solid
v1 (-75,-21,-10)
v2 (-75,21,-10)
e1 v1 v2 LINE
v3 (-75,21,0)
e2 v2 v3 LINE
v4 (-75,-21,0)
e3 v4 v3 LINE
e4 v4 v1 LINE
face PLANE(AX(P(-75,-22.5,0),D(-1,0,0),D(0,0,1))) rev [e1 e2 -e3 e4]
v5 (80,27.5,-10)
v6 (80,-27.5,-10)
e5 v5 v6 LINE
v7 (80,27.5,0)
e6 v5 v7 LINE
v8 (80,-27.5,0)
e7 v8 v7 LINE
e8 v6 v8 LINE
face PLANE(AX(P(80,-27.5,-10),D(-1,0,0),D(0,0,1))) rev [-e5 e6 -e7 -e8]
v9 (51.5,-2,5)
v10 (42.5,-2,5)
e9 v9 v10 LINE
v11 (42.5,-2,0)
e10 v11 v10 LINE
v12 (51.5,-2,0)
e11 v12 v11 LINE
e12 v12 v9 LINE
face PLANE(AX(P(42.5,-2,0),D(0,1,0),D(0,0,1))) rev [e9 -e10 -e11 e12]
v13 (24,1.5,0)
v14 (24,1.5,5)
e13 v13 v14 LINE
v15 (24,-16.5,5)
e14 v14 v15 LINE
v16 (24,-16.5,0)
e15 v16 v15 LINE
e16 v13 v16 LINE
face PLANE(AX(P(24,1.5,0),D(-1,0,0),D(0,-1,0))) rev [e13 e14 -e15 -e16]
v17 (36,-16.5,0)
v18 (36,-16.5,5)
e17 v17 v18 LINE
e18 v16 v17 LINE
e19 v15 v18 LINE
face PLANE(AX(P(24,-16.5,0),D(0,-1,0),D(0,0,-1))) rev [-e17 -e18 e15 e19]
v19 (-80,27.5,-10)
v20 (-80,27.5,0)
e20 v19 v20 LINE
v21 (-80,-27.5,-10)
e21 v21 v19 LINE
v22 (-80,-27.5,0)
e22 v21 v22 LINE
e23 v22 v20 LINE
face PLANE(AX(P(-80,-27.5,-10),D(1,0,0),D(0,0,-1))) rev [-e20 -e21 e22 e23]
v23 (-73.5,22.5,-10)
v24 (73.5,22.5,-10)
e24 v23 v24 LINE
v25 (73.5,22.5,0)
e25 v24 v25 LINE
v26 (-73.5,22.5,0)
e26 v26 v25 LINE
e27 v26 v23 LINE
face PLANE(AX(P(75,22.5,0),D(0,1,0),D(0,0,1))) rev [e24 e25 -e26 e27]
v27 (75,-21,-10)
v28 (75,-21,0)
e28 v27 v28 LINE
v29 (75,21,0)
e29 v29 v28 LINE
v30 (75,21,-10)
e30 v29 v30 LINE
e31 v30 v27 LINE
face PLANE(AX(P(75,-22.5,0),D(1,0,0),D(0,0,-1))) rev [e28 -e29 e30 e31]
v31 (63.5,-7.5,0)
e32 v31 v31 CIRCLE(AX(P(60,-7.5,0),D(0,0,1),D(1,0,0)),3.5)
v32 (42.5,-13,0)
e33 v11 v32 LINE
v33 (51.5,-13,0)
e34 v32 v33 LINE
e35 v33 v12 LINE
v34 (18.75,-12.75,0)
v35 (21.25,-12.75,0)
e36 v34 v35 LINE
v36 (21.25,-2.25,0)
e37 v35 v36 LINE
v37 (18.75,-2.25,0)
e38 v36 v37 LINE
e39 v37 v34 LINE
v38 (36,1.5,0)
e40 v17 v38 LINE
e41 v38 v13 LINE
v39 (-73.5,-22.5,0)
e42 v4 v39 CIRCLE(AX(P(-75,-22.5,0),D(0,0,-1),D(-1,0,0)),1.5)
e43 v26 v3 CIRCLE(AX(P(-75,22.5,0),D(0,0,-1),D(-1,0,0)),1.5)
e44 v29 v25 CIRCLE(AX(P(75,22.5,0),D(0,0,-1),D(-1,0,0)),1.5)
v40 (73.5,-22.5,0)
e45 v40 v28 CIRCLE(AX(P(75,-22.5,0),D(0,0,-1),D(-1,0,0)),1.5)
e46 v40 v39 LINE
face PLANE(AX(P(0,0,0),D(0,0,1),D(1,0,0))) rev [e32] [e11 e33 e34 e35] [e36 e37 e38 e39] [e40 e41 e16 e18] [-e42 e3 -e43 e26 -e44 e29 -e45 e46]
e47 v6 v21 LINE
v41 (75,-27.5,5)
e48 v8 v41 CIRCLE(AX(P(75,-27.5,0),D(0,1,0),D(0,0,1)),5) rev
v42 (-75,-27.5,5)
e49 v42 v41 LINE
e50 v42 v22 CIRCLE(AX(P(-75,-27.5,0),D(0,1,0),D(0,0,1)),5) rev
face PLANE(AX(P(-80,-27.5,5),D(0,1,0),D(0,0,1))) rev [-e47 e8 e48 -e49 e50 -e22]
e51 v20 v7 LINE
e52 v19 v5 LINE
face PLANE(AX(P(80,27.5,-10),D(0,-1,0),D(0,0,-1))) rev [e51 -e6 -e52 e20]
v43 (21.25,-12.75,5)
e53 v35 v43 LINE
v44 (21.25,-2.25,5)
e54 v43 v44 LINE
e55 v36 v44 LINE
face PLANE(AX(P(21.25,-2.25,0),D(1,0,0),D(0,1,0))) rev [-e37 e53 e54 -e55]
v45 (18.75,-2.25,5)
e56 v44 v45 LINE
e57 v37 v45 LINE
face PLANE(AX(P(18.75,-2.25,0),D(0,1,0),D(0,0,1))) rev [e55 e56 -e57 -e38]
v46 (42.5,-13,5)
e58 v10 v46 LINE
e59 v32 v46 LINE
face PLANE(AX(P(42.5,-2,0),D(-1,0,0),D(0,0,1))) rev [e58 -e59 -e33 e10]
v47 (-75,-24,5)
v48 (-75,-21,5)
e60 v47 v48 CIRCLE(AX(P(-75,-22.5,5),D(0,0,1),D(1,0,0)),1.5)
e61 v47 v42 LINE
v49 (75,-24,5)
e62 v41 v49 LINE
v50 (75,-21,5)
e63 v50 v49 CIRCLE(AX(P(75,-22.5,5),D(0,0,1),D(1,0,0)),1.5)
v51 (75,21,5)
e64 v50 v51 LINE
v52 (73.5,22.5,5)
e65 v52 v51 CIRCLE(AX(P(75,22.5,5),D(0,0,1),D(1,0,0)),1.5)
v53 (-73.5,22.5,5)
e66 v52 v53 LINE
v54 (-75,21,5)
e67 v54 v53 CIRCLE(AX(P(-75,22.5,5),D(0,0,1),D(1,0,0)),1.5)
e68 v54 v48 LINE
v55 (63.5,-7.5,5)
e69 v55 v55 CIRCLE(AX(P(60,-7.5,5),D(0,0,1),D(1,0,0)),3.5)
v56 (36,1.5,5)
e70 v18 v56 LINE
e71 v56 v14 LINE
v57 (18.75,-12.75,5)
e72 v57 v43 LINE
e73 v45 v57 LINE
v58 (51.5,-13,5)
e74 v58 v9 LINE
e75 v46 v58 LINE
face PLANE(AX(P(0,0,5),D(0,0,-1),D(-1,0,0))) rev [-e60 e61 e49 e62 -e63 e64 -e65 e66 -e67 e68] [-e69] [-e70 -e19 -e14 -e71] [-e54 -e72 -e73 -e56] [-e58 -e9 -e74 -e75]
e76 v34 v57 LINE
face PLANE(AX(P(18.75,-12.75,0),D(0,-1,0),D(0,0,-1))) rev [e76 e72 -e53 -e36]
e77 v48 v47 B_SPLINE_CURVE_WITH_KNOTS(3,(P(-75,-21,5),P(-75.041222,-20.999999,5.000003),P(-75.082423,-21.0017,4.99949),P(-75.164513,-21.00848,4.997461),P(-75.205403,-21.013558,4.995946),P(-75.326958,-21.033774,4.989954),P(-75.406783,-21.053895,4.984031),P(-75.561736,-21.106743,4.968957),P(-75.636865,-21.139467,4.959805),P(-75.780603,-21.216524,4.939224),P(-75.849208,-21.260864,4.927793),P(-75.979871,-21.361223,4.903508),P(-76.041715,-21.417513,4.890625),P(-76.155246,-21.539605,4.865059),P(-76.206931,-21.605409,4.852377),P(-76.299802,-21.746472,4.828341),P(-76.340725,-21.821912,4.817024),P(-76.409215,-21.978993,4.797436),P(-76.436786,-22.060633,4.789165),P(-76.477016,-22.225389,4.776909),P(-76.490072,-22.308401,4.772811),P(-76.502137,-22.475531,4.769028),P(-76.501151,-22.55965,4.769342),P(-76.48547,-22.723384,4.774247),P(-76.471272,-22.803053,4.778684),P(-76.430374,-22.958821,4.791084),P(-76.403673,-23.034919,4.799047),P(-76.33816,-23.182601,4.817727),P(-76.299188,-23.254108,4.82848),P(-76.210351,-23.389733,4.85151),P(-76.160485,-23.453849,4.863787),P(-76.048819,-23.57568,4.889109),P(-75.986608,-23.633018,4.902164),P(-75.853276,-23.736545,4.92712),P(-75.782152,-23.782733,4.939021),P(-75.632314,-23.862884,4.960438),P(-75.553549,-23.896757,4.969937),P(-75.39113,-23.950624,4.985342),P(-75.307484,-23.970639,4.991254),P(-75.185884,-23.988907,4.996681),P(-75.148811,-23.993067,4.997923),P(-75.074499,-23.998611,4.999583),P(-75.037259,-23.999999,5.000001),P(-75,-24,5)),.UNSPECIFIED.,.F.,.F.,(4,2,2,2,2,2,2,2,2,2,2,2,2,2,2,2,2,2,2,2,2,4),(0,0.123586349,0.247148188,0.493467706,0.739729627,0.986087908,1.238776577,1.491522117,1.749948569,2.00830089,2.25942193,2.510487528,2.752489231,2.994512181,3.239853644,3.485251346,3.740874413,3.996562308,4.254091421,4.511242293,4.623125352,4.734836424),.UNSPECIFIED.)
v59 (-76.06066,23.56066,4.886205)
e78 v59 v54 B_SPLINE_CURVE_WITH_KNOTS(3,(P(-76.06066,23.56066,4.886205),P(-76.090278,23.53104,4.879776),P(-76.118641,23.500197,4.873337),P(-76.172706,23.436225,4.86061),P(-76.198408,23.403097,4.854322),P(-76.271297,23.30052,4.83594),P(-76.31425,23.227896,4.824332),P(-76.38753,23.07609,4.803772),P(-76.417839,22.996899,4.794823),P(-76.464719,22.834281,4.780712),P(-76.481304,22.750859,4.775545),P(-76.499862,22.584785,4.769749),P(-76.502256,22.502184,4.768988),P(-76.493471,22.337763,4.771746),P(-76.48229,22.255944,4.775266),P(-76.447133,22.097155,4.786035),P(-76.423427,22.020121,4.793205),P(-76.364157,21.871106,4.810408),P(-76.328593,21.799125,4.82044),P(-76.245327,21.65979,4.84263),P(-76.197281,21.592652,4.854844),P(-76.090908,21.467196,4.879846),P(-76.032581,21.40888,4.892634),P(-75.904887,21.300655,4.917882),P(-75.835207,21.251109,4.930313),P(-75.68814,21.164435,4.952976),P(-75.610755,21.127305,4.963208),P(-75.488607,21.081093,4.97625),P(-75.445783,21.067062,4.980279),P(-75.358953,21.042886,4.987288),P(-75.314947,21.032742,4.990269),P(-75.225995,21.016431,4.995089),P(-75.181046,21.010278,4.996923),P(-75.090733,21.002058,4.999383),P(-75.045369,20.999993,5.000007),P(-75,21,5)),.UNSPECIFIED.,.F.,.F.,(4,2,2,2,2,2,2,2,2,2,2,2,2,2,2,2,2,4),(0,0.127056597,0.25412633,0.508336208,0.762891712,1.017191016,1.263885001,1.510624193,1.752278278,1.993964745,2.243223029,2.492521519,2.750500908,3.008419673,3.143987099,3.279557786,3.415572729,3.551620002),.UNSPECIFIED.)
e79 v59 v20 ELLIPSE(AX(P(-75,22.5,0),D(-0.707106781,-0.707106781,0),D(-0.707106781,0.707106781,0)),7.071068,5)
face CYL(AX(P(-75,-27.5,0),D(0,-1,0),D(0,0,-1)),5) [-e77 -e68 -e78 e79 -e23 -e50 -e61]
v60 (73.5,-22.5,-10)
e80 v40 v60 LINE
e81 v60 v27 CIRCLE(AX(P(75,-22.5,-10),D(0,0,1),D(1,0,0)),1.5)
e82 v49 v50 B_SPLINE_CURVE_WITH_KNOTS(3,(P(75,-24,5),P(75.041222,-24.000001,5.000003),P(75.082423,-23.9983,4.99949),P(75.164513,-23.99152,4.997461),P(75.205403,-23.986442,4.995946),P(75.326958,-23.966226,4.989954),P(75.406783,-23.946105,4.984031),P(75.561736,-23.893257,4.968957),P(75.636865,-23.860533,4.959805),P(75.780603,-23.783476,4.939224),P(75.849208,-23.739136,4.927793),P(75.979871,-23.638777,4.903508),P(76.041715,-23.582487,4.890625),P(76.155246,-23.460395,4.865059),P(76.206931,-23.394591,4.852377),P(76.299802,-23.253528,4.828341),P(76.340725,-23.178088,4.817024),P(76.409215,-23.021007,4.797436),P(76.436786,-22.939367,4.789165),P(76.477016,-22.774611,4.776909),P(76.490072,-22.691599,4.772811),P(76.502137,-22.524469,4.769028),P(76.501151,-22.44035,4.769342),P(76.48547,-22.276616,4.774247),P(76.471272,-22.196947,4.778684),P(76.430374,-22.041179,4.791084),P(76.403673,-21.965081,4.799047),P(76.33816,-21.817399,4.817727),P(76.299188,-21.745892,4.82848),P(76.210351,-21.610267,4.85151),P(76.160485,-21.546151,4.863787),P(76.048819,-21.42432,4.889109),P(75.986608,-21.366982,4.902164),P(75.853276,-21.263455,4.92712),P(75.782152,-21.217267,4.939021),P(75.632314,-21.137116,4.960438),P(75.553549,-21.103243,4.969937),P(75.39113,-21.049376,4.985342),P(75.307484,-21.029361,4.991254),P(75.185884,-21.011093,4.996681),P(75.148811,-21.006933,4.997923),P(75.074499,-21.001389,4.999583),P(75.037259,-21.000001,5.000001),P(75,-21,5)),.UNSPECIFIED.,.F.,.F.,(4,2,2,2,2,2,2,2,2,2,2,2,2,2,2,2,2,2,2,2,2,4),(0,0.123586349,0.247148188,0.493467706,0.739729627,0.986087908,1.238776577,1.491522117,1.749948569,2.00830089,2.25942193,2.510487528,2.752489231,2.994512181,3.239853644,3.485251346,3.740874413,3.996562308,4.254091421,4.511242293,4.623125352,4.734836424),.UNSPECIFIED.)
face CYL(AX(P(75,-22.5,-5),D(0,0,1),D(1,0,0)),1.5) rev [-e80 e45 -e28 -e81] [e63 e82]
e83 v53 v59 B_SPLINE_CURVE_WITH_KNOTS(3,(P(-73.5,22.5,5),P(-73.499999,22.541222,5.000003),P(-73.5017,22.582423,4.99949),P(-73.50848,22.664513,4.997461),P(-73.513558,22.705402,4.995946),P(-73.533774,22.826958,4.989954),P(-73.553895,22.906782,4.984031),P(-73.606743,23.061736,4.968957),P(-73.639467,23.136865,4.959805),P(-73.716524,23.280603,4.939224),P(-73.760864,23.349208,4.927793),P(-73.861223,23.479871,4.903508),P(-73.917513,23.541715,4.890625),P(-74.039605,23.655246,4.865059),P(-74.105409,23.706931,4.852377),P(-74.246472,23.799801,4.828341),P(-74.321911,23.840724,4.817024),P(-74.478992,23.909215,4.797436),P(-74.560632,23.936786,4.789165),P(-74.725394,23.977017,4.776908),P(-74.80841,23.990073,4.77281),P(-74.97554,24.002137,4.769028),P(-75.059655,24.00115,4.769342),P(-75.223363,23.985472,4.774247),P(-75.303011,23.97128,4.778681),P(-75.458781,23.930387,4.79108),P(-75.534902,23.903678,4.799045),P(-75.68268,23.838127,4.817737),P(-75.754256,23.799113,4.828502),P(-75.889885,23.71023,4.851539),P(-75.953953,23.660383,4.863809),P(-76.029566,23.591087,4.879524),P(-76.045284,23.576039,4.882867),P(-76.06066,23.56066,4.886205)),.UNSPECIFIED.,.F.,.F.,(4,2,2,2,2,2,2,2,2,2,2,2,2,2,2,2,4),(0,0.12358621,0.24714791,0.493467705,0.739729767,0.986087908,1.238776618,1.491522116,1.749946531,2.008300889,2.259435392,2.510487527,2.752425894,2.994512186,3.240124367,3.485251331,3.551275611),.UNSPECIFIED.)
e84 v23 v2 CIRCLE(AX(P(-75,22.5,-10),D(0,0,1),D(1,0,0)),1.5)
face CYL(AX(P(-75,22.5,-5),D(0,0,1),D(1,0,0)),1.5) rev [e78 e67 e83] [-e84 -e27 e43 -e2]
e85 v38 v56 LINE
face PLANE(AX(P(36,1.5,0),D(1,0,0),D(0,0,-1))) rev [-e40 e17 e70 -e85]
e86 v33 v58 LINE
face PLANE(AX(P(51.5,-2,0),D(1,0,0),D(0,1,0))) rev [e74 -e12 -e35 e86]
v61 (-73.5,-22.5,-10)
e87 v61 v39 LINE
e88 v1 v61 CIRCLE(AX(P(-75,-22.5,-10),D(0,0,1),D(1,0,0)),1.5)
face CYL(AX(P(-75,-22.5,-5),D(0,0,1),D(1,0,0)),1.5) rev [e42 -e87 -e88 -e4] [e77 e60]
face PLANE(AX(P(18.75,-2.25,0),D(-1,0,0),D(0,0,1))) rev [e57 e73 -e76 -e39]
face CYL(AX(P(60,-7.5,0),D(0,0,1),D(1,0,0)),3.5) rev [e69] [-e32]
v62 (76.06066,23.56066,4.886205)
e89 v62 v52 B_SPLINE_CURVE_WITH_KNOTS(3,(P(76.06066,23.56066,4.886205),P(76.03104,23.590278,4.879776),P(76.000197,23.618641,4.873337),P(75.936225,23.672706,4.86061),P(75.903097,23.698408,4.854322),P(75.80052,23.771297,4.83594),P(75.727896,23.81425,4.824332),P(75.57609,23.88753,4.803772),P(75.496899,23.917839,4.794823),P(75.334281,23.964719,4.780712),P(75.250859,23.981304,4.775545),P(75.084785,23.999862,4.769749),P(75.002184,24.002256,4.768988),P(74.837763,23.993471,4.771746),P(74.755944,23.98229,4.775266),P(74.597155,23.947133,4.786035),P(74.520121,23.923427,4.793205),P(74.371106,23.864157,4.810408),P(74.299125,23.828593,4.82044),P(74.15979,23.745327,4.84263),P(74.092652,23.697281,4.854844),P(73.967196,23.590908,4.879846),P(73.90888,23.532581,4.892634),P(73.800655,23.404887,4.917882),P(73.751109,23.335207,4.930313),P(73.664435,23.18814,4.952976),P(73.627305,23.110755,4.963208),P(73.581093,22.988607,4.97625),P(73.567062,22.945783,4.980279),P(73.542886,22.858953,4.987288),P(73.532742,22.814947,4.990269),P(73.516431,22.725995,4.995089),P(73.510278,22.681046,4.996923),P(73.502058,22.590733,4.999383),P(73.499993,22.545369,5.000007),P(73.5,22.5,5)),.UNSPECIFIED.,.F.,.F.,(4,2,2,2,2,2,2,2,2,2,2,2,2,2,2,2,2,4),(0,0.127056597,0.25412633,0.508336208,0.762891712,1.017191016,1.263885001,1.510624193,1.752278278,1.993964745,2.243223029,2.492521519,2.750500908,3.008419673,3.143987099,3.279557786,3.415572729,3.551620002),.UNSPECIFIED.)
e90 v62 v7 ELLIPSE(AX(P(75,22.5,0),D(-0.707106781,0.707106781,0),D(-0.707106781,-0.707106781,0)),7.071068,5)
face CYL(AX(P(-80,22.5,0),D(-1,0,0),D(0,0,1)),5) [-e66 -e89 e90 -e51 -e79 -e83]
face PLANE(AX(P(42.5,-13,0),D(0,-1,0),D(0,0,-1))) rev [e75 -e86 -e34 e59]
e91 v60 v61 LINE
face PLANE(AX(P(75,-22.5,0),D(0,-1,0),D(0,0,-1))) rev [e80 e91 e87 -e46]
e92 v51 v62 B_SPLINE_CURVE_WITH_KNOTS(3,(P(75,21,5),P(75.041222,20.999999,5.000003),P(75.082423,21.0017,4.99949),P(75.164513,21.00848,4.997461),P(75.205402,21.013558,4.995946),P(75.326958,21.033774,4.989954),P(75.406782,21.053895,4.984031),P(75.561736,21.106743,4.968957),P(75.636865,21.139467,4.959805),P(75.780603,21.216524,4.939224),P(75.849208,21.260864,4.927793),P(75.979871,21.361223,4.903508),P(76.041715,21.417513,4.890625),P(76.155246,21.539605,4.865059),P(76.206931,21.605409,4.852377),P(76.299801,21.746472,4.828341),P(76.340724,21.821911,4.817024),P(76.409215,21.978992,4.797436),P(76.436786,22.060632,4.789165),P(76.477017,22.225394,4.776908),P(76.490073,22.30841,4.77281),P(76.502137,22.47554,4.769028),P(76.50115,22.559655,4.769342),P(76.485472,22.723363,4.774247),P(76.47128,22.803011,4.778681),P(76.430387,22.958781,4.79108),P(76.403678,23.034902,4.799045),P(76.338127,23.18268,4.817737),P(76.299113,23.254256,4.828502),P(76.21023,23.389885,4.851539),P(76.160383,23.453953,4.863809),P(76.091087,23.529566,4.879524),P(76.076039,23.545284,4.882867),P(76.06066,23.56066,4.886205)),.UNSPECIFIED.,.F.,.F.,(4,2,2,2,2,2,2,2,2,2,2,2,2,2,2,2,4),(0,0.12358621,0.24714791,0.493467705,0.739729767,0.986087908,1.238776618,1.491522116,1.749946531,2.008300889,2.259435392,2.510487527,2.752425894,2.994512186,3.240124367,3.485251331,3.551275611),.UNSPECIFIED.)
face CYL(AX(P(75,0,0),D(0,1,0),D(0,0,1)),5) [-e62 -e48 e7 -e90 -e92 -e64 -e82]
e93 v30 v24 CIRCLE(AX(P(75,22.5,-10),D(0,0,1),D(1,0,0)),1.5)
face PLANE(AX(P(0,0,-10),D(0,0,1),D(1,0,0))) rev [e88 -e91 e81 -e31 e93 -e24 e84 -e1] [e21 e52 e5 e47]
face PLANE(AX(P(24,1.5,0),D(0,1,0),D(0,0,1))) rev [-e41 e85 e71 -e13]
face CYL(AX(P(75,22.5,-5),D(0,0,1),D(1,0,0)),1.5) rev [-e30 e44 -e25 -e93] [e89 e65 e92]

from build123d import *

# Parameters (mm, degrees)
SKETCH_1_W          = 160
SKETCH_1_H          = 55
EXTRUDE_1_DEPTH     = 5
SKETCH_2_R          = 3.5
SKETCH_2_W          = 9
SKETCH_2_H          = 11
SKETCH_2_W_2        = 12
SKETCH_2_H_2        = 18
SKETCH_2_W_3        = 2.5
SKETCH_2_H_3        = 10.5
CUT_EXTRUDE_1_DEPTH = 5
SKETCH_3_R          = 1.5
CUT_EXTRUDE_2_DEPTH = 10
FILLET_1_R          = 5
SKETCH_5_W          = 160
SKETCH_5_H          = 55
EXTRUDE_2_DEPTH     = 10
SKETCH_6_W          = 150
SKETCH_6_H          = 45
CUT_EXTRUDE_3_DEPTH = 10
SKETCH_3_2_R        = 1.5
CUT_EXTRUDE_4_DEPTH = 86.914201512


with BuildPart() as part:
    # Эскиз1 → Бобышка-Вытянуть1 (new body)
    with BuildSketch(Plane.XY):
        Rectangle(SKETCH_1_W, SKETCH_1_H)
    extrude(amount=EXTRUDE_1_DEPTH)

    # Эскиз2 → Вырез-Вытянуть1 (cut)
    with BuildSketch(Plane.XY.offset(5)):
        with Locations((60, -7.5)):
            Circle(SKETCH_2_R)
        with Locations((47, -7.5)):
            Rectangle(SKETCH_2_W, SKETCH_2_H)
        with Locations((30, -7.5)):
            Rectangle(SKETCH_2_W_2, SKETCH_2_H_2)
        with Locations((20, -7.5)):
            Rectangle(SKETCH_2_W_3, SKETCH_2_H_3)
    extrude(amount=-CUT_EXTRUDE_1_DEPTH, mode=Mode.SUBTRACT)

    # Эскиз3 → Вырез-Вытянуть2 (cut)
    with BuildSketch(Plane.XY.offset(5)):
        with Locations((-75, 22.5)):
            Circle(SKETCH_3_R)
        with Locations((-75, -22.5)):
            Circle(SKETCH_3_R)
        with Locations((75, 22.5)):
            Circle(SKETCH_3_R)
        with Locations((75, -22.5)):
            Circle(SKETCH_3_R)
    extrude(amount=-CUT_EXTRUDE_2_DEPTH, mode=Mode.SUBTRACT)

    # Скругление1
    # the kernel refuses this fillet: 5 mm, written as the material it takes off along each edge
    with BuildSketch(Plane(origin=(-80, 40, 5), x_dir=(0, 0, -1), z_dir=(0, -1, 0)), Plane(origin=(80, -40, 5), x_dir=(0, 0, -1), z_dir=(0, 1, 0))) as fillet_1_piece_1:
        with BuildLine():
            CenterArc((FILLET_1_R, FILLET_1_R), FILLET_1_R, 180, 90)
            Line((0, FILLET_1_R), (0, 0))
            Line((0, 0), (FILLET_1_R, 0))
        make_face()
    extrude(amount=80, mode=Mode.SUBTRACT)
    with BuildSketch(Plane(origin=(92.5, 27.5, 5), x_dir=(0, -1, 0), z_dir=(-1, 0, 0))) as fillet_1_piece_2:
        with BuildLine():
            CenterArc((FILLET_1_R, -FILLET_1_R), FILLET_1_R, 90, 90)
            Line((0, -FILLET_1_R), (0, 0))
            Line((0, 0), (FILLET_1_R, 0))
        make_face()
    extrude(amount=185, mode=Mode.SUBTRACT)

    # Эскиз5 → Бобышка-Вытянуть2 (add)
    with BuildSketch(Plane(origin=(0, 0, 0), x_dir=(-1, 0, 0), z_dir=(0, 0, -1))):
        Rectangle(SKETCH_5_W, SKETCH_5_H)
    extrude(amount=EXTRUDE_2_DEPTH)

    # Эскиз6 → Вырез-Вытянуть3 (cut)
    with BuildSketch(Plane(origin=(0, 0, -10), x_dir=(-1, 0, 0), z_dir=(0, 0, -1))):
        Rectangle(SKETCH_6_W, SKETCH_6_H)
    extrude(amount=-CUT_EXTRUDE_3_DEPTH, mode=Mode.SUBTRACT)

    # Эскиз3<2> → Вырез-Вытянуть4 (cut, through all)
    with BuildSketch(Plane.XY.offset(5)):
        with Locations((-75, 22.5)):
            Circle(SKETCH_3_2_R)
        with Locations(Location((-75, -22.5, 0), (0, 0, 90))):
            Circle(SKETCH_3_2_R)
        with Locations(Location((75, 22.5, 0), (0, 0, 270))):
            Circle(SKETCH_3_2_R)
        with Locations(Location((75, -22.5, 0), (0, 0, 90))):
            Circle(SKETCH_3_2_R)
    extrude(amount=-CUT_EXTRUDE_4_DEPTH, mode=Mode.SUBTRACT)


solid = part.part
